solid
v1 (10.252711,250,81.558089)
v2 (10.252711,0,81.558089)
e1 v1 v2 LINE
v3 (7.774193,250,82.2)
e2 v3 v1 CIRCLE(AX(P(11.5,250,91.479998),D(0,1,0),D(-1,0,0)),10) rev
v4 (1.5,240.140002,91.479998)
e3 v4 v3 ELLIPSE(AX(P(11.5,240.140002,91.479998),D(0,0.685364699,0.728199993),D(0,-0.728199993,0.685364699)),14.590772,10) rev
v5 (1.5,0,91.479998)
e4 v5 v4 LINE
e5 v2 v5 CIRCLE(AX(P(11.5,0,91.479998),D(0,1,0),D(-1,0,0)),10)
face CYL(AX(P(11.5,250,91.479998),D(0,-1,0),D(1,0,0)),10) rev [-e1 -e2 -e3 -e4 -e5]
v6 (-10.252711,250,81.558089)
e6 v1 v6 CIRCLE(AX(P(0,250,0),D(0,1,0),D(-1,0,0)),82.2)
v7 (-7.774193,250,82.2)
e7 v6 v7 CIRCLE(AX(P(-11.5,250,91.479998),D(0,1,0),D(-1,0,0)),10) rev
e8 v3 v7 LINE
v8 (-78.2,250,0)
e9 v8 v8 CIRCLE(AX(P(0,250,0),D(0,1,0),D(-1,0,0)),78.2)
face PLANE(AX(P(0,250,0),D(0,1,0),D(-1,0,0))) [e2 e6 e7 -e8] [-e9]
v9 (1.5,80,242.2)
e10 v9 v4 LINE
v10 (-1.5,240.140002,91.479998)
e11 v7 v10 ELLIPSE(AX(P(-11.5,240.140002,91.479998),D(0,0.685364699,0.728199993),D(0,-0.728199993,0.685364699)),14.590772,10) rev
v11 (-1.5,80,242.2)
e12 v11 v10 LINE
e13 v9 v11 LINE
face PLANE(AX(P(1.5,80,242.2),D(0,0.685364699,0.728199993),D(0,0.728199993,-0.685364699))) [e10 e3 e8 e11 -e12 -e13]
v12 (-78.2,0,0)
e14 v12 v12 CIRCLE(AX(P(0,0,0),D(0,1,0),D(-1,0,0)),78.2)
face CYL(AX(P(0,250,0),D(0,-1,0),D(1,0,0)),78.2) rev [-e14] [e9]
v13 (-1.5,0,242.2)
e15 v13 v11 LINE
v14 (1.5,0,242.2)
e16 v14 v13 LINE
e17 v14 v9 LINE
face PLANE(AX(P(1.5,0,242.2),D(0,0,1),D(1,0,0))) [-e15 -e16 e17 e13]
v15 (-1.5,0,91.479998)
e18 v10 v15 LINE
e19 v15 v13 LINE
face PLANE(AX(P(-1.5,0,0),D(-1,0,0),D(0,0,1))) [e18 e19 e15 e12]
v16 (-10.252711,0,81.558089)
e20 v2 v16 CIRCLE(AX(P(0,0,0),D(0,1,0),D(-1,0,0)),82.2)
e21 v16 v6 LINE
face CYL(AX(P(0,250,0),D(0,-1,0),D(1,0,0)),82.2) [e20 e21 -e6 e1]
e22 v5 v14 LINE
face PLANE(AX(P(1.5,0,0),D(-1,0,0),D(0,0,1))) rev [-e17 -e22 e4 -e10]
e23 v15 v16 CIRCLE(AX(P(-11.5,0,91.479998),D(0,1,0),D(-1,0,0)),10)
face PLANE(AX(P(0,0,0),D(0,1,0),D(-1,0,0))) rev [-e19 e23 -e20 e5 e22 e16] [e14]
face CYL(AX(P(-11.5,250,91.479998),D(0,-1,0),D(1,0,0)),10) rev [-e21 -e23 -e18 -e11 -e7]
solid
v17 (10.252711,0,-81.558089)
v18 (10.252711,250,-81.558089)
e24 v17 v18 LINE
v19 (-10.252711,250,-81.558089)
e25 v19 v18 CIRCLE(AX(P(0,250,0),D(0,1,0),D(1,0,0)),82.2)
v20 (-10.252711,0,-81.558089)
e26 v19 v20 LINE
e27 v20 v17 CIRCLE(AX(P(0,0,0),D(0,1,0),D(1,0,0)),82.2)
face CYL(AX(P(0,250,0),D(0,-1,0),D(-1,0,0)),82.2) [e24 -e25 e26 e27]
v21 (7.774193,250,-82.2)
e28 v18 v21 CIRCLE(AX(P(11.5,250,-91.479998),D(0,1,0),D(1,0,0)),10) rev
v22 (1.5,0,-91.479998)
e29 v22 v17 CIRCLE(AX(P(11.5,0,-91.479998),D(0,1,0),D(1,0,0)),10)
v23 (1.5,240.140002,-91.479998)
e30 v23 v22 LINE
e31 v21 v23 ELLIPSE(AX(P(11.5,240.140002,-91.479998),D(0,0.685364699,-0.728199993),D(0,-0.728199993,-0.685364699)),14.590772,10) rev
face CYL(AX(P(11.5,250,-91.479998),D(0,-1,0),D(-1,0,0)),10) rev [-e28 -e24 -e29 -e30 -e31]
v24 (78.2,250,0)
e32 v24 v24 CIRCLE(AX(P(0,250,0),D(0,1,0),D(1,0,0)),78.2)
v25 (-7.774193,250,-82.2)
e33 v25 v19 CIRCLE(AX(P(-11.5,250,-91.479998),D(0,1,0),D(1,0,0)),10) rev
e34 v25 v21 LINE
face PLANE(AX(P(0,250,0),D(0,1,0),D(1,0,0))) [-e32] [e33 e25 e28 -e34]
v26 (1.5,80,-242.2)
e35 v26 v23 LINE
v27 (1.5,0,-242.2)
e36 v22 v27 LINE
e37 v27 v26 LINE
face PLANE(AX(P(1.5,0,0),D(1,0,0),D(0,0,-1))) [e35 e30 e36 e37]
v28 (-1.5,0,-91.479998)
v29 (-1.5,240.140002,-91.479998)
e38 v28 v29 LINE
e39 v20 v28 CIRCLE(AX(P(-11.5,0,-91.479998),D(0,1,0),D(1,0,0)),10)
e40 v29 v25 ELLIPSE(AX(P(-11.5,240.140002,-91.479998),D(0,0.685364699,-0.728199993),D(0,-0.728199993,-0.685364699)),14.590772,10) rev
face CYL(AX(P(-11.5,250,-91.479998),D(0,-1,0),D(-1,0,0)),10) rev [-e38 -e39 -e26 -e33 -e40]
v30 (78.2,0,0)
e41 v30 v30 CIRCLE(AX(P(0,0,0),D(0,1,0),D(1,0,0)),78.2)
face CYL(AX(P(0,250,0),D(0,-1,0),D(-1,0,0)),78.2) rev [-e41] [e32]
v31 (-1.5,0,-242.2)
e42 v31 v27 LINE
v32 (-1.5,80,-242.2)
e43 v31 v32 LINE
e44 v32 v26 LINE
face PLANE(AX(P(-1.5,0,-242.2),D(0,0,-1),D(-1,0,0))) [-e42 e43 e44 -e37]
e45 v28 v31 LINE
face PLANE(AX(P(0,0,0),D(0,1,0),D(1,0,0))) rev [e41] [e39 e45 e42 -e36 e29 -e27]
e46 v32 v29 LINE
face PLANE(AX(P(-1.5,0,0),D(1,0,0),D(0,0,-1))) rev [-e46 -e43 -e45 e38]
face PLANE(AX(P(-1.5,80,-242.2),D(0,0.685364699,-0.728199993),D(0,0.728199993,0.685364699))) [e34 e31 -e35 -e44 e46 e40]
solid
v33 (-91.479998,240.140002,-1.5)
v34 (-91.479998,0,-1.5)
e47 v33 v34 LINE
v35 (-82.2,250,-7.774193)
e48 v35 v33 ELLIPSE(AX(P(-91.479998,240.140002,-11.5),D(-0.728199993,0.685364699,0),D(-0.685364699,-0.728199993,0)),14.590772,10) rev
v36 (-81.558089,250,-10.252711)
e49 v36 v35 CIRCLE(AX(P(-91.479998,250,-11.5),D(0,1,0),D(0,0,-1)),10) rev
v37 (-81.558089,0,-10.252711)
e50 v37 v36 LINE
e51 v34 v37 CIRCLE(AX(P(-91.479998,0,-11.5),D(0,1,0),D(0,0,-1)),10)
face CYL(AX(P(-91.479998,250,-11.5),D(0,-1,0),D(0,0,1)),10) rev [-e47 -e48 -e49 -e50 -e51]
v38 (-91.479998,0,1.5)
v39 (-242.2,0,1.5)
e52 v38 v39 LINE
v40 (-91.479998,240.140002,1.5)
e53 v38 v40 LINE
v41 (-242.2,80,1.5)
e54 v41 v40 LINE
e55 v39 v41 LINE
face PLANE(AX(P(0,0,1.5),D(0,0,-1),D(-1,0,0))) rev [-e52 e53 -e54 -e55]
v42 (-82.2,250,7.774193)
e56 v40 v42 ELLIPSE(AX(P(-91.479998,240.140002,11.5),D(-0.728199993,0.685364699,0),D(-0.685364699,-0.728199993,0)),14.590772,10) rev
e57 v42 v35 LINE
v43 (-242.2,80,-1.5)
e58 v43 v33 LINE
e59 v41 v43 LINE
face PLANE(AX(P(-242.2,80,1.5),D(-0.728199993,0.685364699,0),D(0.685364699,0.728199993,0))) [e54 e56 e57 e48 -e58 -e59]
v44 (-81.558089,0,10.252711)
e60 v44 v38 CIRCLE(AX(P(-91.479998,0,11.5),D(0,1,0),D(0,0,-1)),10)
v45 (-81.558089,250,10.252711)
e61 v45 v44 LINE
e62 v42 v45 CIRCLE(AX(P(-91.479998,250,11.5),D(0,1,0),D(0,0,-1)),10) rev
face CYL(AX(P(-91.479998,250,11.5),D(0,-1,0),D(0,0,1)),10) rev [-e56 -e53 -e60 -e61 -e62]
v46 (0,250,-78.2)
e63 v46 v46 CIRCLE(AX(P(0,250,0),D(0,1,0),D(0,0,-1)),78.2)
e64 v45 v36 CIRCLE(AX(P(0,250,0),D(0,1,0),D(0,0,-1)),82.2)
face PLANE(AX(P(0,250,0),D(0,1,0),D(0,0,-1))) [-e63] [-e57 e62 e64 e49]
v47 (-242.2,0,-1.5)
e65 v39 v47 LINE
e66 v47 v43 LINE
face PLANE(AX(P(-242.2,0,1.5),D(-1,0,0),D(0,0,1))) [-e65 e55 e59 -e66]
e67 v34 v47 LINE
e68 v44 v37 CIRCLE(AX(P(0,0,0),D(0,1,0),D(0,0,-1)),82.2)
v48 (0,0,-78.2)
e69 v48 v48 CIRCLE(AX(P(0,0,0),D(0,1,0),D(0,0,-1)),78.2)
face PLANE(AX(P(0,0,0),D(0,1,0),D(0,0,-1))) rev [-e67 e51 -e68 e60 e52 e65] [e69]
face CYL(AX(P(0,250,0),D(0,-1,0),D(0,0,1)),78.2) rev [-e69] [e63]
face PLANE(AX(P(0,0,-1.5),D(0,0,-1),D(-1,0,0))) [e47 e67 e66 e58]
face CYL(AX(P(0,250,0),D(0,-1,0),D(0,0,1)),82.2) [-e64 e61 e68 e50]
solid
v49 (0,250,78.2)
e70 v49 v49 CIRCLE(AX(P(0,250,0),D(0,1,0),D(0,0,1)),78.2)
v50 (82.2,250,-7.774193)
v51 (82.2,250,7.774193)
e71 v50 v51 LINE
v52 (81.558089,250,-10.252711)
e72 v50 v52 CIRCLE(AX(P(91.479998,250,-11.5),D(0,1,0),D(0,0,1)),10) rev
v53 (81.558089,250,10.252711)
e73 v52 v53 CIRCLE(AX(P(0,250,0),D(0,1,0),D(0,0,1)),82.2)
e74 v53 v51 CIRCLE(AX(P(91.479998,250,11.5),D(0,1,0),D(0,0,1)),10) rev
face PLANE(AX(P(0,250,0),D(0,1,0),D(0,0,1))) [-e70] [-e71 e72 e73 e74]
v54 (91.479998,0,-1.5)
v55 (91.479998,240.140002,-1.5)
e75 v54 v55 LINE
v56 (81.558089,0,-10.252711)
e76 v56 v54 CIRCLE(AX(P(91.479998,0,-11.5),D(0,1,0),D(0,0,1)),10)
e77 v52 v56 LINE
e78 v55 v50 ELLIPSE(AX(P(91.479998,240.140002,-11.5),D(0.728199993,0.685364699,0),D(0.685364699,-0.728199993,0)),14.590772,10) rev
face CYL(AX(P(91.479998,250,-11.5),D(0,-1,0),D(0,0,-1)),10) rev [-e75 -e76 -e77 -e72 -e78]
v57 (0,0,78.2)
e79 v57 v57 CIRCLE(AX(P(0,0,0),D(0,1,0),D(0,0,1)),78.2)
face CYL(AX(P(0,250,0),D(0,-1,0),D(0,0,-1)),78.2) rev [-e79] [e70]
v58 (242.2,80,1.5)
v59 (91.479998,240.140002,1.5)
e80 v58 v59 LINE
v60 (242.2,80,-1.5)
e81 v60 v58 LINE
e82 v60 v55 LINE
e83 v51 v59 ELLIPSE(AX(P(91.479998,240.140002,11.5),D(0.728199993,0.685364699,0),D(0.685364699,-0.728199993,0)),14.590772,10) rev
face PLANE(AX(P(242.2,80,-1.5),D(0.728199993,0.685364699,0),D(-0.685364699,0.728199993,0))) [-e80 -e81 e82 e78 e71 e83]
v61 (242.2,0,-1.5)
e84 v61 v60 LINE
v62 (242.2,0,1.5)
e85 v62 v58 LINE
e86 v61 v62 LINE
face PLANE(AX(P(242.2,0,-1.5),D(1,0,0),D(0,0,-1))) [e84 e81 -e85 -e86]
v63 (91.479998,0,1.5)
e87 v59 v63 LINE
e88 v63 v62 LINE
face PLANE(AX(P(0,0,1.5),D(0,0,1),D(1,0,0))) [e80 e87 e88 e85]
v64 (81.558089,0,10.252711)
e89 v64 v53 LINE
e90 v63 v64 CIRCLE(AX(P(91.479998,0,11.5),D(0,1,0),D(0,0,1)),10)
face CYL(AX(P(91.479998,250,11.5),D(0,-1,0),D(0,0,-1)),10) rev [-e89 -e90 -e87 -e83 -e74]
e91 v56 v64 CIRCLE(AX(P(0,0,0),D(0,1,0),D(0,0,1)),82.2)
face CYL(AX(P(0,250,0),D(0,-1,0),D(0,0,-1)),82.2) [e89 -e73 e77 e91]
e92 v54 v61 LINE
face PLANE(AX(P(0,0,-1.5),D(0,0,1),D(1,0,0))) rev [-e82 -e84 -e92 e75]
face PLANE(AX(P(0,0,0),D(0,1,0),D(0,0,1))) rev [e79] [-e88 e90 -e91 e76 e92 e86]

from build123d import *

# Parameters (mm, degrees)
SKETCH1_R                = 82.2
SKETCH1_R_2              = 78.2
BOSS_EXTRUDE1_DEPTH      = 250
BOSS_EXTRUDE2_DEPTH      = 1.5
BOSS_EXTRUDE2_DEPTH_BACK = 1.5
BOSS_EXTRUDE3_DEPTH      = 1.5
BOSS_EXTRUDE3_DEPTH_BACK = 1.5
SKETCH4_W                = 2
SKETCH4_H                = 250
FILLET1_R                = 10
CIRPATTERN1_COUNT        = 4


with BuildPart() as part:
    # Sketch1 → Boss-Extrude1 (new body)
    with BuildSketch(Plane(origin=(0, 0, 0), x_dir=(1, 0, 0), z_dir=(0, 1, 0))):
        with Locations(Location((0, 0, 0), (0, 0, 270))):
            Circle(SKETCH1_R)
        with Locations(Location((0, 0, 0), (0, 0, 270))):
            Circle(SKETCH1_R_2, mode=Mode.SUBTRACT)
    extrude(amount=BOSS_EXTRUDE1_DEPTH)



with BuildPart() as body_2:
    # Sketch2 → Boss-Extrude2 (new, two sides: drawn at the far end of the back side and taken through both)
    with BuildSketch(Plane.XY.offset(-BOSS_EXTRUDE2_DEPTH_BACK)):
        Polygon((82.2, 0), (82.2, 250), (242.2, 80), (242.2, 0), align=None)
    extrude(amount=BOSS_EXTRUDE2_DEPTH + BOSS_EXTRUDE2_DEPTH_BACK)


with BuildPart() as part_1:
    add(part.part)

    add(body_2.part)  # Boss-Extrude3 merges body 2
    # Sketch4 → Boss-Extrude3 (add, two sides: drawn at the far end of the back side and taken through both)
    with BuildSketch(Plane.XY.offset(-BOSS_EXTRUDE3_DEPTH_BACK)):
        with Locations((81.2, 125)):
            Rectangle(SKETCH4_W, SKETCH4_H)
    extrude(amount=BOSS_EXTRUDE3_DEPTH + BOSS_EXTRUDE3_DEPTH_BACK)

    # Fillet1
    # the kernel refuses this fillet: 10 mm, written as the material it adds along each edge
    with BuildSketch(Plane(origin=(82.186312729, 250, -1.5), x_dir=(1, 0, 0), z_dir=(0, -1, 0))) as fillet1_piece_1_section:
        with BuildLine():
            CenterArc((9.293685085, -10), FILLET1_R, 90, 82.834902495)
            ThreePointArc((-0.628223572, -8.752711497), (-0.19722945, -4.384744947), (0, 0))
            Line((0, 0), (9.293685085, 0))
        make_face()
    fillet1_piece_1 = extrude(amount=250, mode=Mode.PRIVATE)
    fillet1_piece_1 = split(fillet1_piece_1, bisect_by=Plane(origin=(146.068392849, 182.139832598, -3.473148008), z_dir=(-0.7281999926928029, -0.685364699004991, 0)), keep=Keep.TOP, mode=Mode.PRIVATE)
    add(fillet1_piece_1)
    with BuildSketch(Plane(origin=(82.186312729, 250, 1.5), x_dir=(-0.07159057113580586, 0, 0.9974341031488995), z_dir=(0, -1, 0))) as fillet1_piece_2_section:
        with BuildLine():
            CenterArc((9.309000808, -9.985744159), FILLET1_R, 93.059748024, 82.834902495)
            Line((-0.665340223, -9.269838447), (0, 0))
            ThreePointArc((0, 0), (4.387613913, -0.117183015), (8.775227826, 0))
        make_face()
    fillet1_piece_2 = extrude(amount=250, mode=Mode.PRIVATE)
    fillet1_piece_2 = split(fillet1_piece_2, bisect_by=Plane(origin=(146.06839285, 182.139832597, 3.473148008), z_dir=(-0.7281999926928029, -0.685364699004991, 0)), keep=Keep.TOP, mode=Mode.PRIVATE)
    add(fillet1_piece_2)


with BuildPart() as cirpattern1_1:
    # CirPattern1: pattern copy
    add(part_1.part.rotate(Axis((0, 0, 0), (0, 1, 0)), 1 * 360 / CIRPATTERN1_COUNT))


with BuildPart() as cirpattern1_2:
    # CirPattern1: pattern copy
    add(part_1.part.rotate(Axis((0, 0, 0), (0, 1, 0)), 2 * 360 / CIRPATTERN1_COUNT))


with BuildPart() as cirpattern1_3:
    # CirPattern1: pattern copy
    add(part_1.part.rotate(Axis((0, 0, 0), (0, 1, 0)), 3 * 360 / CIRPATTERN1_COUNT))


solid = Compound([part_1.part, cirpattern1_1.part, cirpattern1_2.part, cirpattern1_3.part])
